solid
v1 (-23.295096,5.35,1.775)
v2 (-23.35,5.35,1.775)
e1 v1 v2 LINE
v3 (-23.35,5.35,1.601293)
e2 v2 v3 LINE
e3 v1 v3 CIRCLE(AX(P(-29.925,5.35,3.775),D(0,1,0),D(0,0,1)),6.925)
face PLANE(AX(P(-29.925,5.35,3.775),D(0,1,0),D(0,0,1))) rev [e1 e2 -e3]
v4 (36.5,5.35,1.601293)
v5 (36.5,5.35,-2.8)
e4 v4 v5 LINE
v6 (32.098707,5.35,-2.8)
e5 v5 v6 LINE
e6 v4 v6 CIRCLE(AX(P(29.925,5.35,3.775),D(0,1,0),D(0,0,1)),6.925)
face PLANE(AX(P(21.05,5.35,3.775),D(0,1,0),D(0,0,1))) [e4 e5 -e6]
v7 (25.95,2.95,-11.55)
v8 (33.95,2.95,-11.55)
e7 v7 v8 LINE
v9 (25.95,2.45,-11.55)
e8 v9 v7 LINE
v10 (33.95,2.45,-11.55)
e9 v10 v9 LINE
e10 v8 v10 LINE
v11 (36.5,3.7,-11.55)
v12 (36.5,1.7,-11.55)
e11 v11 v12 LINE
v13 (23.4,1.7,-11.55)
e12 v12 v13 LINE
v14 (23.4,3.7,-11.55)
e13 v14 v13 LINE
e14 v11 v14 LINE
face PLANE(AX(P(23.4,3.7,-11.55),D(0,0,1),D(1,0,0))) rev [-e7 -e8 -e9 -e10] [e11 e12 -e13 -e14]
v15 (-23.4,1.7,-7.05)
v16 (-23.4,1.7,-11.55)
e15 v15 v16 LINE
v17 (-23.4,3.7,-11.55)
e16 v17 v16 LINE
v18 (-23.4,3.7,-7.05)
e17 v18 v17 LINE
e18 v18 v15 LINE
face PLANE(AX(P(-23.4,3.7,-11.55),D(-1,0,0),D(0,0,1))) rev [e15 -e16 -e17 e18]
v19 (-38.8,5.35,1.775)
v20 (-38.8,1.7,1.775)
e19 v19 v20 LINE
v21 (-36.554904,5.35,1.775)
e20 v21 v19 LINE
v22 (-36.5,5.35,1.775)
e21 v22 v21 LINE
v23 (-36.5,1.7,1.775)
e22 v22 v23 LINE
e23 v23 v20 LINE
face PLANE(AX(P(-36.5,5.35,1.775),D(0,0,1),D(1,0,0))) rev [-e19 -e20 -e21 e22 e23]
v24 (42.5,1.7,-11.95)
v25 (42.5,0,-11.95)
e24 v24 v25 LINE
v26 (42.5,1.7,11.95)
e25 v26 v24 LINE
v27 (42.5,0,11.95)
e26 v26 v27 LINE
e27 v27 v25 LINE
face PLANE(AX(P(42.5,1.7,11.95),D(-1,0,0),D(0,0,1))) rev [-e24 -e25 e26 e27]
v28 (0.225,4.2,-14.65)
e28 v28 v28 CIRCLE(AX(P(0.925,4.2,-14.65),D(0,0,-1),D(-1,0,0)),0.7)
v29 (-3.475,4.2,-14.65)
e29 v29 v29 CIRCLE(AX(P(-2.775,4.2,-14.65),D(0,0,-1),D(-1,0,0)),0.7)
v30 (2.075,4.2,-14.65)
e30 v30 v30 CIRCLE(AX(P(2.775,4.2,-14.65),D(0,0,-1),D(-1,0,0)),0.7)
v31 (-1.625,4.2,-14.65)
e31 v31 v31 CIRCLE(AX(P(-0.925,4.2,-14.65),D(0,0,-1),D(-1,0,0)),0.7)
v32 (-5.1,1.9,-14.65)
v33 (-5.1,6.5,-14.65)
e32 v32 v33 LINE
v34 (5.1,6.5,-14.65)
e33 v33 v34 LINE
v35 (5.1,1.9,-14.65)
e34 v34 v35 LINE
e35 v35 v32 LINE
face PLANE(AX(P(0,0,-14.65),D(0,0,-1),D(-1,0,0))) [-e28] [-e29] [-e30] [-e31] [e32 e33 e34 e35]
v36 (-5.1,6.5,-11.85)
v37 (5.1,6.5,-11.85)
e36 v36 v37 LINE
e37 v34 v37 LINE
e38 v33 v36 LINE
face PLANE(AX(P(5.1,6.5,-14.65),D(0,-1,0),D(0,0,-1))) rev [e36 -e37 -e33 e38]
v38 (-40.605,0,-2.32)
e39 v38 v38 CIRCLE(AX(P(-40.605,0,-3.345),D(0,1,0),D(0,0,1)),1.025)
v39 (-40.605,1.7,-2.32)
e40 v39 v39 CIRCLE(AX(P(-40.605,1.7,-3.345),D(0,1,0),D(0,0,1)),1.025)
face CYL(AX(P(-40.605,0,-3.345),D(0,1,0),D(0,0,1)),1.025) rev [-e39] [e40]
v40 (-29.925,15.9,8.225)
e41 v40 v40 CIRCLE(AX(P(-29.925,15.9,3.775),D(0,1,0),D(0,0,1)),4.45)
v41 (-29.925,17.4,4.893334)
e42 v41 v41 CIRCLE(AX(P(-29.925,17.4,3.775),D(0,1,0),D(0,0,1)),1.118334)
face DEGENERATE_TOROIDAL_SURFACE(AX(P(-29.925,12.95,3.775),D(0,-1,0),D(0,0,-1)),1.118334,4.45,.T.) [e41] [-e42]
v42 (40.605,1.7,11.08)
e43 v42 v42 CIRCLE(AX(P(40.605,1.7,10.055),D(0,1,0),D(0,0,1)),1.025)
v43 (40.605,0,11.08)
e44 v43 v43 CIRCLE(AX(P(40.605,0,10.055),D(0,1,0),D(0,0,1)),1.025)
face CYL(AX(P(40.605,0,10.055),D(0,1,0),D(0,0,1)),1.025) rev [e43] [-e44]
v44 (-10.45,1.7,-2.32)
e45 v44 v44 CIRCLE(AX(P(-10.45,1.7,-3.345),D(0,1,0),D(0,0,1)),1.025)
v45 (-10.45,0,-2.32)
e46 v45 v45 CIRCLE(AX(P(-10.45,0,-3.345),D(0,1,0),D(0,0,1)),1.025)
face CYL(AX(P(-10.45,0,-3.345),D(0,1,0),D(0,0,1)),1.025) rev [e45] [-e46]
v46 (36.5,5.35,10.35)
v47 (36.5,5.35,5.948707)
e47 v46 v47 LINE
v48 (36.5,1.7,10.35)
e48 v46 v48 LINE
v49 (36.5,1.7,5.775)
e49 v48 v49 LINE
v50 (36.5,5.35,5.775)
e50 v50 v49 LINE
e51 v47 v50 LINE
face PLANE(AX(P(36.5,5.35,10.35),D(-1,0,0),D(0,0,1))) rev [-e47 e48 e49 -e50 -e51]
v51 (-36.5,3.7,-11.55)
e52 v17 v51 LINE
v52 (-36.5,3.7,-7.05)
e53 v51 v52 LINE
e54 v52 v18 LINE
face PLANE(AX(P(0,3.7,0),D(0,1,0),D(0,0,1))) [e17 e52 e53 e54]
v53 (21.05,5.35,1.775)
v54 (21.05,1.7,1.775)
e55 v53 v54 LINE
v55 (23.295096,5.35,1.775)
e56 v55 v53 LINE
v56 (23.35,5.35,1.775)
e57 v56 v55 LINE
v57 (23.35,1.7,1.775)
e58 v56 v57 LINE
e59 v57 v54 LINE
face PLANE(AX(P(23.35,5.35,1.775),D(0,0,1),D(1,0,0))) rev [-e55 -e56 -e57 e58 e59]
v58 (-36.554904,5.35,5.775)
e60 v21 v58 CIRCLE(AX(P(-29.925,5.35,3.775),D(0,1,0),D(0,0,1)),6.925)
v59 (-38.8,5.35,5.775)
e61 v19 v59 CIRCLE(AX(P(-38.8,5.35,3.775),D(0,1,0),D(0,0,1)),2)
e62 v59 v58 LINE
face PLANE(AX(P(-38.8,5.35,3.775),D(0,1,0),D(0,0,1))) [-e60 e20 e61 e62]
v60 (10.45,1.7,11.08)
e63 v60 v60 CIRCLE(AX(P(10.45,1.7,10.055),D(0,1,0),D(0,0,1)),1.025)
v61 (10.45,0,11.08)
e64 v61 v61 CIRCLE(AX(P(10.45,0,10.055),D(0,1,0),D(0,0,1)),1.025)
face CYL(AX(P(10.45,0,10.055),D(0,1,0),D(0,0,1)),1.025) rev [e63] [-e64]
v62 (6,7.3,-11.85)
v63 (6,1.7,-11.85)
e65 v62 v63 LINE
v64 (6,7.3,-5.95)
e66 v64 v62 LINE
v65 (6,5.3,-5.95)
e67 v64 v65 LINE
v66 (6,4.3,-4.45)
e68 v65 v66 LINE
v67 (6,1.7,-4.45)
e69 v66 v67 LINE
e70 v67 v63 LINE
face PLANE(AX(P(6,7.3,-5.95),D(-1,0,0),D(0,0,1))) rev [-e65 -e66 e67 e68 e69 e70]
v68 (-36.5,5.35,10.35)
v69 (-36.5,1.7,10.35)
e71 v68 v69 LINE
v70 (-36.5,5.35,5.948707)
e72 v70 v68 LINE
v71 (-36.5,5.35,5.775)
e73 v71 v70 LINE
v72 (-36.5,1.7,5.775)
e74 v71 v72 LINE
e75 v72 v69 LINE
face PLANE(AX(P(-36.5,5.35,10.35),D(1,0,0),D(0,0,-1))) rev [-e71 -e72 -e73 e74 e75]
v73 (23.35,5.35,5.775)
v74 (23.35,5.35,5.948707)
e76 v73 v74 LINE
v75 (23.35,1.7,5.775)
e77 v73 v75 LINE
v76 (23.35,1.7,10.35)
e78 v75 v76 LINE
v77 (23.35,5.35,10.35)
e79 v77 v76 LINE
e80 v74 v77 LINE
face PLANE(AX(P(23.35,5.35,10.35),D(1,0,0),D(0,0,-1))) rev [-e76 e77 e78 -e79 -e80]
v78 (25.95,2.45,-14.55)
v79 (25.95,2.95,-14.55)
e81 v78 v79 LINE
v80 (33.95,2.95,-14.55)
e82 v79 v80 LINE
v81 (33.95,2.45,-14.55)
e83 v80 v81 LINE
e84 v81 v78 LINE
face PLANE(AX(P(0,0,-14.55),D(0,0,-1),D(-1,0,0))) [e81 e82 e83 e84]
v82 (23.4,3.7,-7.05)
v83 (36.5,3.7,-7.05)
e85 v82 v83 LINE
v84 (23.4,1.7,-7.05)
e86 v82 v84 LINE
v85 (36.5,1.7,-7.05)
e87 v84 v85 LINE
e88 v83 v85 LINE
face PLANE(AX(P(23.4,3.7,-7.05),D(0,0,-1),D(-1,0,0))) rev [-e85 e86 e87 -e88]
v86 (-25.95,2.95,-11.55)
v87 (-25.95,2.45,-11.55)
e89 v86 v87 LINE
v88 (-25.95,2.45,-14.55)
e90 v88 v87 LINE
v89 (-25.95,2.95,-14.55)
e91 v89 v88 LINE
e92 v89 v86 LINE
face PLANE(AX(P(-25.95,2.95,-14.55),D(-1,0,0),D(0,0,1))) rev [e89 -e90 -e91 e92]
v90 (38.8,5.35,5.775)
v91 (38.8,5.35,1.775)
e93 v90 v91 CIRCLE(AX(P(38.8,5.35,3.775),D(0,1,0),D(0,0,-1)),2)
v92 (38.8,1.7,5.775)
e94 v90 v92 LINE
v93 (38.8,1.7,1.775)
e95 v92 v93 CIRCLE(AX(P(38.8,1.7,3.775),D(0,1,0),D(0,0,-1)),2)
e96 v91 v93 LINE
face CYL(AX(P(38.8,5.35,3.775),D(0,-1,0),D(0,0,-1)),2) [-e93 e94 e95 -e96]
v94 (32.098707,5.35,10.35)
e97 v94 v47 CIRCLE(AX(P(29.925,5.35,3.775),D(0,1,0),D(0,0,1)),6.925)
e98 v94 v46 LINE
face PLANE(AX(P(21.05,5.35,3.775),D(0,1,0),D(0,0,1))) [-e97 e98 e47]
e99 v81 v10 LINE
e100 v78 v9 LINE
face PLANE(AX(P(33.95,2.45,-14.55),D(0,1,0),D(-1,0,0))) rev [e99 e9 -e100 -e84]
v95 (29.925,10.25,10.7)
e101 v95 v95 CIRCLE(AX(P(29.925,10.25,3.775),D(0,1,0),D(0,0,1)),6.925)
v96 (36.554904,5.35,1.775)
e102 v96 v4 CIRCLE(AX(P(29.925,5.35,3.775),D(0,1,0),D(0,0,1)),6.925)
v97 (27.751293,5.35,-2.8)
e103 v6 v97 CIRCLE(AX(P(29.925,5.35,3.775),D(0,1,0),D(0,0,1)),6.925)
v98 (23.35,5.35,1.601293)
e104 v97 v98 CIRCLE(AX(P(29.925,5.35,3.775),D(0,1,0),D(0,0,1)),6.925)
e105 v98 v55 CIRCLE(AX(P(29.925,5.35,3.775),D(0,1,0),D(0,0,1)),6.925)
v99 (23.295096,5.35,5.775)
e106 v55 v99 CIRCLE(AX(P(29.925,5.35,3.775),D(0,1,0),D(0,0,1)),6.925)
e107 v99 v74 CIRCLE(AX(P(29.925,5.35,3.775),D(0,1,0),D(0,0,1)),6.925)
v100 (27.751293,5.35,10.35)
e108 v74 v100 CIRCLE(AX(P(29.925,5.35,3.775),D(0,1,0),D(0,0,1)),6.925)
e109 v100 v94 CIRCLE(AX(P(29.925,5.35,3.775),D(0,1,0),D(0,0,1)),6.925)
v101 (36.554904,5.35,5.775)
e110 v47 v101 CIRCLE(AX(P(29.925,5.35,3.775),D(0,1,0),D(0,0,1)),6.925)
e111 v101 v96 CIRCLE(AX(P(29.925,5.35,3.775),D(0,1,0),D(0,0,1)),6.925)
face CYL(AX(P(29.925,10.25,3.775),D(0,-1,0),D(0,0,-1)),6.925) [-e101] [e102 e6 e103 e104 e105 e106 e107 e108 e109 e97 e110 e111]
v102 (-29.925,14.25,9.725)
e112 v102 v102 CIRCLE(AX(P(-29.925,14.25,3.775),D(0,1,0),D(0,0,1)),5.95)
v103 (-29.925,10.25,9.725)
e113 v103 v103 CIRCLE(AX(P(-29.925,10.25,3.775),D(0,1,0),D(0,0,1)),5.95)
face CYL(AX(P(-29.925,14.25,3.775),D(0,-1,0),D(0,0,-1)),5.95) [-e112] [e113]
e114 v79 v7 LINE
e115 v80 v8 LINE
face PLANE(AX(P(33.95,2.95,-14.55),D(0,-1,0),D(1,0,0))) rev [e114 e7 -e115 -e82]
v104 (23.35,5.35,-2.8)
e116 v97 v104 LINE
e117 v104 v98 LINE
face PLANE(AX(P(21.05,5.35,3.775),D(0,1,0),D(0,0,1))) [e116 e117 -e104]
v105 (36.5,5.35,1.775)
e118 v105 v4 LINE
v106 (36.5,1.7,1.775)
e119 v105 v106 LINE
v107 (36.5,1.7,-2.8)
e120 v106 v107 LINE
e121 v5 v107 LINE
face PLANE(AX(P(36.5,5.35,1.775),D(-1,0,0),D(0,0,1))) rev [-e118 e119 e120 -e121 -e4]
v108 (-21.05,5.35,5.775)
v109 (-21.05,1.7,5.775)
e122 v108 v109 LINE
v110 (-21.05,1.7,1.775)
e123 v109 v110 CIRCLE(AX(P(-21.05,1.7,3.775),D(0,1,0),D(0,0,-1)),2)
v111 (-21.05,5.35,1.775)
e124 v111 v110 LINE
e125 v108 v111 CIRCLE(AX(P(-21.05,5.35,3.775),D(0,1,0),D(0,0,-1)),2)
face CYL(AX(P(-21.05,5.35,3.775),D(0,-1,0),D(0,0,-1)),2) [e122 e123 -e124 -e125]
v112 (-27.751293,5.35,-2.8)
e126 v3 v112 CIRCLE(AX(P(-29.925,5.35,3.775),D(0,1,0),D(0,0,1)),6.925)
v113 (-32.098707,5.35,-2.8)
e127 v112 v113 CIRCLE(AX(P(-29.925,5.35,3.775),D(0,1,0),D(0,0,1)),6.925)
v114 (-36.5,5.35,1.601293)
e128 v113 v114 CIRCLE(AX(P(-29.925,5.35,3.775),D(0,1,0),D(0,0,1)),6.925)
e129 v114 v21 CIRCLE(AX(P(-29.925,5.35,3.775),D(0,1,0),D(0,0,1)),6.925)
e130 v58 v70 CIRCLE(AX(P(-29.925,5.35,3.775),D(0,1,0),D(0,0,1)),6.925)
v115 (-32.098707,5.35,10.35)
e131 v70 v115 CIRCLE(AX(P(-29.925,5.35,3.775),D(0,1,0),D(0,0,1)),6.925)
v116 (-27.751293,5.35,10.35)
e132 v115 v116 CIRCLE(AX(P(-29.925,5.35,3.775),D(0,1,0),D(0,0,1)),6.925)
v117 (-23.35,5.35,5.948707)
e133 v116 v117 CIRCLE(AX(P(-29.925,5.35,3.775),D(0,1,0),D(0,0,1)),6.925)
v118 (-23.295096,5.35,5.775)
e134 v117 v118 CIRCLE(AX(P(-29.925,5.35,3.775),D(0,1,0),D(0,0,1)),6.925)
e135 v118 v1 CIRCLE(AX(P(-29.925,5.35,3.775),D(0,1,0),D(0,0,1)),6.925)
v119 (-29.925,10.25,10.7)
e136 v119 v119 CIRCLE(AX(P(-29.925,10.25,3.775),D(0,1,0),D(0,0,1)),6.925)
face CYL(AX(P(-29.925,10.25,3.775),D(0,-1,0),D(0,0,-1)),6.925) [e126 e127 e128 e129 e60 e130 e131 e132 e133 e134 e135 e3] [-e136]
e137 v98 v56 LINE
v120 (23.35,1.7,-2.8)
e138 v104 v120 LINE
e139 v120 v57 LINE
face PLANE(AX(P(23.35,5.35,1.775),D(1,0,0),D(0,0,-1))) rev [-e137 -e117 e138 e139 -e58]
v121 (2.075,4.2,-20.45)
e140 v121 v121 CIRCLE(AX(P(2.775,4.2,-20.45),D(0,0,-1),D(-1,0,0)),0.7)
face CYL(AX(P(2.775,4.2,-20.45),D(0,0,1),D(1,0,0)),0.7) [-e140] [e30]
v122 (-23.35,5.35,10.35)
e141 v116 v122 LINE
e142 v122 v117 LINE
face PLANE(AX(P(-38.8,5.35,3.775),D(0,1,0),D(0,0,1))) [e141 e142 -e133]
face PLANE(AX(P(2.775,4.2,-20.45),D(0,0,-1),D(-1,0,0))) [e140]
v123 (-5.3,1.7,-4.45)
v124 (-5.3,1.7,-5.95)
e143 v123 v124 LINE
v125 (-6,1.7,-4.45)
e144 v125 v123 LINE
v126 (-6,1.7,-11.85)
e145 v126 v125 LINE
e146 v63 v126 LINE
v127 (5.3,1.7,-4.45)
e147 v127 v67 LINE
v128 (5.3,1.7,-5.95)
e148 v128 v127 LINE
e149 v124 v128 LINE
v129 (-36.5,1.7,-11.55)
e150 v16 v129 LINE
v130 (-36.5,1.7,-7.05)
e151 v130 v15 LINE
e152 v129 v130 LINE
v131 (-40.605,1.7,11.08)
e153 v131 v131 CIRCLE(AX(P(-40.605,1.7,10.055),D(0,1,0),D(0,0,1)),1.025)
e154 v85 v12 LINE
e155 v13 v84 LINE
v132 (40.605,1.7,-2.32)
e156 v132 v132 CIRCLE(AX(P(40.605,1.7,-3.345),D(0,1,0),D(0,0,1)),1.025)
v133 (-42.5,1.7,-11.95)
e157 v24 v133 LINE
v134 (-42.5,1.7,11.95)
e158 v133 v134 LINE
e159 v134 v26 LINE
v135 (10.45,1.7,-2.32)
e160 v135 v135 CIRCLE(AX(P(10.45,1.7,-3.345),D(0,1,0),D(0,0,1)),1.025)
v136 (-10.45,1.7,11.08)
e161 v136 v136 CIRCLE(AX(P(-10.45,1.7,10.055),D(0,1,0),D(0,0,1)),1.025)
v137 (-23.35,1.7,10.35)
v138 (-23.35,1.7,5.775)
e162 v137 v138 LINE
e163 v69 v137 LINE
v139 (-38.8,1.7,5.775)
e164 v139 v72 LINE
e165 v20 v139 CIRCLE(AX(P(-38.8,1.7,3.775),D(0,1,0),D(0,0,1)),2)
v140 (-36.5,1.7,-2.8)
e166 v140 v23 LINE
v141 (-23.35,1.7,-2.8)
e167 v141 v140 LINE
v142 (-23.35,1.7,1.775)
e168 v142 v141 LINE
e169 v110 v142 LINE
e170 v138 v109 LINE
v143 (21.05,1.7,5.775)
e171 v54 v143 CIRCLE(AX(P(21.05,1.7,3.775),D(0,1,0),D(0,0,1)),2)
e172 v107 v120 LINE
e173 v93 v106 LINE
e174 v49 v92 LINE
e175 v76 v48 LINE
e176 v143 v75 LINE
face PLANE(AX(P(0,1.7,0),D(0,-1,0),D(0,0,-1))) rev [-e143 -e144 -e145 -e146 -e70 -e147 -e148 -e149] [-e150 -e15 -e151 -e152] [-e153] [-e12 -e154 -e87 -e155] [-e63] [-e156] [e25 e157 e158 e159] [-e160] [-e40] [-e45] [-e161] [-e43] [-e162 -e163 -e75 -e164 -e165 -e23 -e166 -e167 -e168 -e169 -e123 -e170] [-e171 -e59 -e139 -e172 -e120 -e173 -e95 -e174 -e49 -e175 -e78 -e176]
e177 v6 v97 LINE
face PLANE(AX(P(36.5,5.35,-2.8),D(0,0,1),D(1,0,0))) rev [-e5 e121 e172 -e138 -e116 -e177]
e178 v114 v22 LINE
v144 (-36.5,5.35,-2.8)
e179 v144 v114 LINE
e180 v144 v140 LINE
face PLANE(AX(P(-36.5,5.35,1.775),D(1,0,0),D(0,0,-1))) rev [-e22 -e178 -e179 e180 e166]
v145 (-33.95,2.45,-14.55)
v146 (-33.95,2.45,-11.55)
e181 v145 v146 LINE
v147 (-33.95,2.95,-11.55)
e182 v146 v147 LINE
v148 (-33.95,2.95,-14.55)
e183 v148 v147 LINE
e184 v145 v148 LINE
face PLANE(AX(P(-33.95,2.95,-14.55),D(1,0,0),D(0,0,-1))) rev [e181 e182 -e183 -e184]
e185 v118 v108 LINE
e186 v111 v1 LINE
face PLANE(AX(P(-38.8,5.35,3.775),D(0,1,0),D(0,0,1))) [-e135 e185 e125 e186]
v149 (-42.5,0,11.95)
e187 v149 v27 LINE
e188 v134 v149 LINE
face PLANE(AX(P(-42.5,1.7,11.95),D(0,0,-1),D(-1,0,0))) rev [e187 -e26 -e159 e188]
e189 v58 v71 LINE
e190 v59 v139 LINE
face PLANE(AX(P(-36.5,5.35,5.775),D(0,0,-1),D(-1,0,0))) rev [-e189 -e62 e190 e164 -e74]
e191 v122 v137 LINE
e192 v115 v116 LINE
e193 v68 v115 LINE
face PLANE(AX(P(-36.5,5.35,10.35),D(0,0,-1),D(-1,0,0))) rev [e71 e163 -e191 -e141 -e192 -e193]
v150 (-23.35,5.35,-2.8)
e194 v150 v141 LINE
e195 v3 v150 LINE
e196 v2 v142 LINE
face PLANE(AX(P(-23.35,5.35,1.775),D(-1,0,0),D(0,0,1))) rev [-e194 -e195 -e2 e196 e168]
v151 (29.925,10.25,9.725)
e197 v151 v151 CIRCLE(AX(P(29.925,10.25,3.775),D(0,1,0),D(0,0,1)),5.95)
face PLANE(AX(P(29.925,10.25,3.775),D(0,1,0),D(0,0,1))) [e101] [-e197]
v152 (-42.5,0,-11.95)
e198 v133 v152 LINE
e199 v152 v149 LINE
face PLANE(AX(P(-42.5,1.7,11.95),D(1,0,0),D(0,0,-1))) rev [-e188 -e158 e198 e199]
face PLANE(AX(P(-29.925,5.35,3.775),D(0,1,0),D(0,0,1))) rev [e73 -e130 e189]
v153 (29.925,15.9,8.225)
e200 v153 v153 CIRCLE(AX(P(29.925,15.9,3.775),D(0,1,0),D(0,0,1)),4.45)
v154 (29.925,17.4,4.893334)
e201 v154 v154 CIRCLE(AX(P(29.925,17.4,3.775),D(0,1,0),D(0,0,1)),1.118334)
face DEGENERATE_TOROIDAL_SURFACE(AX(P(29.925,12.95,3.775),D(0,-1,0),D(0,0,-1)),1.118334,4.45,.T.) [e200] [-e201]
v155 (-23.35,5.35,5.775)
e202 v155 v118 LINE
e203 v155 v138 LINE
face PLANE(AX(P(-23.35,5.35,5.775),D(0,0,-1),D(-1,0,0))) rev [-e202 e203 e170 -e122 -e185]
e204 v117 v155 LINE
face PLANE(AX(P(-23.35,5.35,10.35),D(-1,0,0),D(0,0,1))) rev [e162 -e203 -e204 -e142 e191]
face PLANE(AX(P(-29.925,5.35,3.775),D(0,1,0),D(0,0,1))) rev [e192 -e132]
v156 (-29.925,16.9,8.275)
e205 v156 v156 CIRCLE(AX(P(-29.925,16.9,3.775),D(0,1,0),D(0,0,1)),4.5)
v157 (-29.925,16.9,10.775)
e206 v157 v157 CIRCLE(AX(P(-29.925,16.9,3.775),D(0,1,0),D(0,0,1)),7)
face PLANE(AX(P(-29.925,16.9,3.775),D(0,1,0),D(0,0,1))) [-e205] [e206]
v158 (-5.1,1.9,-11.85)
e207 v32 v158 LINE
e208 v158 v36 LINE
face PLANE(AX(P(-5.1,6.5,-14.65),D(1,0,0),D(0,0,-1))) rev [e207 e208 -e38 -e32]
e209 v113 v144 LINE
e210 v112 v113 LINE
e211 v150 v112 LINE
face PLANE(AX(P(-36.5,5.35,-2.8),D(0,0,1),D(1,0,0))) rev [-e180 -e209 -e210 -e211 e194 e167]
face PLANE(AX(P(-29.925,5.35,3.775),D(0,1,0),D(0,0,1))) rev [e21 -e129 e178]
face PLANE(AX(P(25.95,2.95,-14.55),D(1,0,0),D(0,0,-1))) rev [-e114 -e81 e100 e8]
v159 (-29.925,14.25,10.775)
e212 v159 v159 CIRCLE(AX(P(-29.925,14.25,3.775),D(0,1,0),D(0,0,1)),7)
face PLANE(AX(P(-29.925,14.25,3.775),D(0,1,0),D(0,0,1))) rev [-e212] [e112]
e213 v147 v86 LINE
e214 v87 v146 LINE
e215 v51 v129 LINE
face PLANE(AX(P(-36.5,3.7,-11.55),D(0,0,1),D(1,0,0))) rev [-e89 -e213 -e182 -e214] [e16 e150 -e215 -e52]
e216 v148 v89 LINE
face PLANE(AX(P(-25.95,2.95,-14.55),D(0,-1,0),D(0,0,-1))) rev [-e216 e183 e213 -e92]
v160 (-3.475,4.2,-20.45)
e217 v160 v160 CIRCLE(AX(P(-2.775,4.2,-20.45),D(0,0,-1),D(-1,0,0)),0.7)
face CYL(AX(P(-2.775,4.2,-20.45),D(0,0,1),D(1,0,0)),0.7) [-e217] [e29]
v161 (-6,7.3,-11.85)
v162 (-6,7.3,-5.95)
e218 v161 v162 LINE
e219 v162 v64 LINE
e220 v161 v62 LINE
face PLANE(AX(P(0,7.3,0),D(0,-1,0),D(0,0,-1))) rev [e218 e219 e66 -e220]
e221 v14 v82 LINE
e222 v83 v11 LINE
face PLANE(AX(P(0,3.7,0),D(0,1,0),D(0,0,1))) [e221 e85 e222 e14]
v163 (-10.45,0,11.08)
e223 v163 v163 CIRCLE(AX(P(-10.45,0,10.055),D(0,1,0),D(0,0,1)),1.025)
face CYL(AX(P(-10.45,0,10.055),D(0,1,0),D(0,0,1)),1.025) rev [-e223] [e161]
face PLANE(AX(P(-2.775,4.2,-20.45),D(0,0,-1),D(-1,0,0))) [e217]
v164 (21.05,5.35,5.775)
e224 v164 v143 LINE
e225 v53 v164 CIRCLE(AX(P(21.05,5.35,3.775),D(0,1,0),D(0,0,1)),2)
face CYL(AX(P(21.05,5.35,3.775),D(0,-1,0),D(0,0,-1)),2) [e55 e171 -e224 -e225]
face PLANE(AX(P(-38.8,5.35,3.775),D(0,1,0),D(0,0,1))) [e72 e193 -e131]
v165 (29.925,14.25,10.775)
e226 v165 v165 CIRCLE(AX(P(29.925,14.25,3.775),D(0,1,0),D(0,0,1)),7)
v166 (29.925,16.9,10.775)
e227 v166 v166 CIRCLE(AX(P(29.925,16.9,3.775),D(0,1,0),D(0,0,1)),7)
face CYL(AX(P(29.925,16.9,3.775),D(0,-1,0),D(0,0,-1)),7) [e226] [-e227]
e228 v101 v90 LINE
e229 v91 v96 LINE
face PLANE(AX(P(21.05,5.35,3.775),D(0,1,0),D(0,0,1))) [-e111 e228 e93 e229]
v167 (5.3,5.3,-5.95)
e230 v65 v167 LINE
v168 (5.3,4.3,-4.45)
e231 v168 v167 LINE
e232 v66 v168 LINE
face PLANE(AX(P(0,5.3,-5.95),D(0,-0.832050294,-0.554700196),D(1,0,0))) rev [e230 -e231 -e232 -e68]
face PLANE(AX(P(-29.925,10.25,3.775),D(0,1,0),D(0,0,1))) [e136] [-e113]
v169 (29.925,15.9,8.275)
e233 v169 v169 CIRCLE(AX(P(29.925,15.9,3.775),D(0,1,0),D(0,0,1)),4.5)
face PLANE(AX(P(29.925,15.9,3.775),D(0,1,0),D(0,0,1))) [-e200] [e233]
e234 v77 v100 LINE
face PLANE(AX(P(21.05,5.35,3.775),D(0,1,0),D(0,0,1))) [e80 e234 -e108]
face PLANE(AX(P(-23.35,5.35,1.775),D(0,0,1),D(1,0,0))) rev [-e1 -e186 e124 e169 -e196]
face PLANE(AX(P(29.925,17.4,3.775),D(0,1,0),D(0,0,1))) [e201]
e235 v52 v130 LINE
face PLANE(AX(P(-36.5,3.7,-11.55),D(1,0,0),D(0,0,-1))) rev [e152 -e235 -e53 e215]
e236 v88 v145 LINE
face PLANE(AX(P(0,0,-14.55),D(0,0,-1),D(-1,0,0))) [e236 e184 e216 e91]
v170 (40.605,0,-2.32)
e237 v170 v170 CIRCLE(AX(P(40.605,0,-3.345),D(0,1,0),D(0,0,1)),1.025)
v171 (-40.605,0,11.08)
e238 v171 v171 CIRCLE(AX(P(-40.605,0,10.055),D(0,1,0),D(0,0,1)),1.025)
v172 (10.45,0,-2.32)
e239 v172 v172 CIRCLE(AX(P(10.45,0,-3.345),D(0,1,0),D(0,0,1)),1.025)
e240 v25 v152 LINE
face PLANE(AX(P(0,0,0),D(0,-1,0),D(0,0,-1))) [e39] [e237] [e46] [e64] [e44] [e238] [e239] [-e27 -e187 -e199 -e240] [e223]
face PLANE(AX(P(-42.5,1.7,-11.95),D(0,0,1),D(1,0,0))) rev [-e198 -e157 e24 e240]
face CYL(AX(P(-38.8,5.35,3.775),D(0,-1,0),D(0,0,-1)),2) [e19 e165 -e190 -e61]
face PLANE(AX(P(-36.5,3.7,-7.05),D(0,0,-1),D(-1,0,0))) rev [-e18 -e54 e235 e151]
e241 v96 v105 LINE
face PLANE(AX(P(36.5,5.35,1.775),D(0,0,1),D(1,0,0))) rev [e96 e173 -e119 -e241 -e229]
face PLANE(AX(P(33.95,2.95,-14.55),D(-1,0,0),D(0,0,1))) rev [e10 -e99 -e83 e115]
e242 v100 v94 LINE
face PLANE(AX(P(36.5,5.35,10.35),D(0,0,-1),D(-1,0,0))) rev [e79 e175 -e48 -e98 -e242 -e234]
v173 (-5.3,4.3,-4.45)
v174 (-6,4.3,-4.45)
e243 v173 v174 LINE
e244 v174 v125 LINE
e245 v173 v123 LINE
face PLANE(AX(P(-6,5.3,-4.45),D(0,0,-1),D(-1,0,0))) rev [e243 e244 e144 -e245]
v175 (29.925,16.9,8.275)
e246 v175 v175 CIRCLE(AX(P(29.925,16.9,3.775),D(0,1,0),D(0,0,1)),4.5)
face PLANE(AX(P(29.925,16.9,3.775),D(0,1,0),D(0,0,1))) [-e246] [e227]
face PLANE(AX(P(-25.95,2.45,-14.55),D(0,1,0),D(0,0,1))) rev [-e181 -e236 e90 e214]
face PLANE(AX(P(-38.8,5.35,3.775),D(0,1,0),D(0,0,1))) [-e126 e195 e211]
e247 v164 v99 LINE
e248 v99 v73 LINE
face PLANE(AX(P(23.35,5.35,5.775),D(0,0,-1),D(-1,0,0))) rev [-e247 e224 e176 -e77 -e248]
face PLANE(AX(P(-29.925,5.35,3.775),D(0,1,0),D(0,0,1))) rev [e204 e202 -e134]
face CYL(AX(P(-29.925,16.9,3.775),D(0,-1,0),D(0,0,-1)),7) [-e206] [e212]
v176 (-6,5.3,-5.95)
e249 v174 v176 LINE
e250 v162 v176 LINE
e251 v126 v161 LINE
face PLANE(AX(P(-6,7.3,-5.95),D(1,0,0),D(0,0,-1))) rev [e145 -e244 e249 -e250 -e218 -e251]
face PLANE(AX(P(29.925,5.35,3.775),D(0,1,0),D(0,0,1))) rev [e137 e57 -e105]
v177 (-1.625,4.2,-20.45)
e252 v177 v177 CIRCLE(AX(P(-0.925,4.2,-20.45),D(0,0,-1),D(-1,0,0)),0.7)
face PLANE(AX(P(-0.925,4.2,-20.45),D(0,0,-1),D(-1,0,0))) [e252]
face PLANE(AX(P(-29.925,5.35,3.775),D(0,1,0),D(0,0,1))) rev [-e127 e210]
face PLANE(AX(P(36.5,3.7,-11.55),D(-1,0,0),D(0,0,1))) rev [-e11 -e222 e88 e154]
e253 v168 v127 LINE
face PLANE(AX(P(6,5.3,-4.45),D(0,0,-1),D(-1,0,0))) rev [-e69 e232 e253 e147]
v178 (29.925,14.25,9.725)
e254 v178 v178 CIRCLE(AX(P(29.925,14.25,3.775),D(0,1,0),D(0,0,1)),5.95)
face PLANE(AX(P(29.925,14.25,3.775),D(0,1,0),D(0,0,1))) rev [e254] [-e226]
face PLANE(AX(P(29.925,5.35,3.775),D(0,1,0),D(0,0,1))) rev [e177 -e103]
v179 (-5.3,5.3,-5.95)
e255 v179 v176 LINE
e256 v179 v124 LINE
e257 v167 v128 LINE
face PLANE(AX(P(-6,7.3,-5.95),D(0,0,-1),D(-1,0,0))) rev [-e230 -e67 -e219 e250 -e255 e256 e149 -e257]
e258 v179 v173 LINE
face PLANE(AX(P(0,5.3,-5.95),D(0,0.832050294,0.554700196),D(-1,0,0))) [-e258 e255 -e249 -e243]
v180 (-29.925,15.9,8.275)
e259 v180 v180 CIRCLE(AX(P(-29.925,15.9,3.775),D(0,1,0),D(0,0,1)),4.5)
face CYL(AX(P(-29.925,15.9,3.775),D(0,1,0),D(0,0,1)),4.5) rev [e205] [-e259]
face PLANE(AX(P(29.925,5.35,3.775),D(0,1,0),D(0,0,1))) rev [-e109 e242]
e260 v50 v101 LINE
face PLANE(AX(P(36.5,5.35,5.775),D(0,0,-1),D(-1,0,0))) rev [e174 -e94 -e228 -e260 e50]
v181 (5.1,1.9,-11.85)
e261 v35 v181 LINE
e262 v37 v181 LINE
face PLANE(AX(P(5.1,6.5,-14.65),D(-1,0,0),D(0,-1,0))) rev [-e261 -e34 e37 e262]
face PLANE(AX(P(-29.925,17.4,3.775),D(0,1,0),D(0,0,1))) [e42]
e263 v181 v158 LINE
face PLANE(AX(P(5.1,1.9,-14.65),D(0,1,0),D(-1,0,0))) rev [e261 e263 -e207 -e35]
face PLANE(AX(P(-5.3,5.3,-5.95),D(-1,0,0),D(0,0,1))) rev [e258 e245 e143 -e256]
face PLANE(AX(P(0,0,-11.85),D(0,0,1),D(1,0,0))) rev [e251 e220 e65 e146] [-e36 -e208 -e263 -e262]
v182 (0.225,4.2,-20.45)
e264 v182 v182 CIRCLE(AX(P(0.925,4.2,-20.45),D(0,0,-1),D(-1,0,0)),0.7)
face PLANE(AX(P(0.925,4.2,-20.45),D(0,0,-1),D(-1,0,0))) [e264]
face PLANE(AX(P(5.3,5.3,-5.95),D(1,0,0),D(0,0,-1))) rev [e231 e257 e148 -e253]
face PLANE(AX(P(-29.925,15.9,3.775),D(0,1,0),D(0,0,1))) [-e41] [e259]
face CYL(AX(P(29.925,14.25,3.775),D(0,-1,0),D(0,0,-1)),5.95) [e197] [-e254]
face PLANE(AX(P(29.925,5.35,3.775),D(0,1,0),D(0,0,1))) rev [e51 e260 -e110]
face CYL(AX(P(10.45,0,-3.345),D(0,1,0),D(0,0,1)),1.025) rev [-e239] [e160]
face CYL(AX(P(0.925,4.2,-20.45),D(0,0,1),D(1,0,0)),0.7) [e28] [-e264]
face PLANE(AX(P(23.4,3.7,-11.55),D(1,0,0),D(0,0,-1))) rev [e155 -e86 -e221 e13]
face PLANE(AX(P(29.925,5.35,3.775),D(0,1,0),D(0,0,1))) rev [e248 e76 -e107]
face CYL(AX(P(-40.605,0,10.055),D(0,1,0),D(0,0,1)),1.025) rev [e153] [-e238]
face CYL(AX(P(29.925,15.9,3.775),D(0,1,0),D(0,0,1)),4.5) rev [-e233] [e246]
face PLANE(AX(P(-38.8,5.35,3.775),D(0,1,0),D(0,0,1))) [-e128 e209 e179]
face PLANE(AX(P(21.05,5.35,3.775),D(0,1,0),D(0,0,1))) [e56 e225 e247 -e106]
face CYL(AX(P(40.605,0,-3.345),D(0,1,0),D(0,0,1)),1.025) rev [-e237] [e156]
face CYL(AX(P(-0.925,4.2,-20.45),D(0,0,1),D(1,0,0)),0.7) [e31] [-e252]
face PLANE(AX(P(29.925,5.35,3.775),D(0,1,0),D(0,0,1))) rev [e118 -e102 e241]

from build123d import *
from OCP.BRepFilletAPI import BRepFilletAPI_MakeChamfer

# Parameters (mm, degrees)
SKETCH1_W            = 85
SKETCH1_H            = 23.9
BOSS_EXTRUDE1_DEPTH  = 1.7
SKETCH2_R            = 1.025
CUT_EXTRUDE1_DEPTH   = 45.180793338
SKETCH3_W            = 12
SKETCH3_H            = 6
BOSS_EXTRUDE2_DEPTH  = 5.6
SKETCH4_W            = 0.7
SKETCH4_H            = 1.5
BOSS_EXTRUDE3_DEPTH  = 3.6
CHAMFER1_SIZE        = 1.5
CHAMFER1_SIZE_2      = 1
SKETCH5_W            = 12
SKETCH5_H            = 5.6
CUT_EXTRUDE2_DEPTH   = 0.1
SKETCH6_W            = 10.2
SKETCH6_H            = 4.6
BOSS_EXTRUDE4_DEPTH  = 2.8
SKETCH7_R            = 0.7
BOSS_EXTRUDE5_DEPTH  = 5.8
BOSS_EXTRUDE6_DEPTH  = 3.65
SKETCH9_R            = 6.925
BOSS_EXTRUDE7_DEPTH  = 4.9
SKETCH10_R           = 5.95
BOSS_EXTRUDE8_DEPTH  = 4
SKETCH11_R           = 7
BOSS_EXTRUDE9_DEPTH  = 2.65
SKETCH12_R           = 4.5
CUT_EXTRUDE3_DEPTH   = 1
SKETCH13_R           = 4.45
BOSS_EXTRUDE10_DEPTH = 1.5
FILLET1_R            = 4.45
SKETCH14_W           = 13.1
SKETCH14_H           = 4.5
BOSS_EXTRUDE11_DEPTH = 2
SKETCH15_W           = 8
SKETCH15_H           = 0.5
BOSS_EXTRUDE12_DEPTH = 3


# Some blends are built 0.0001 mm under size
with BuildPart() as part:
    # Sketch1 → Boss-Extrude1 (new body)
    with BuildSketch(Plane(origin=(0, 0, 0), x_dir=(1, 0, 0), z_dir=(0, 1, 0))):
        Rectangle(SKETCH1_W, SKETCH1_H)
    extrude(amount=BOSS_EXTRUDE1_DEPTH)

    # Sketch2 → Cut-Extrude1 (cut, through all)
    with BuildSketch(Plane(origin=(0, 1.7, 0), x_dir=(1, 0, 0), z_dir=(0, 1, 0))):
        with Locations(Location((-40.605, 3.345, 0), (0, 0, 270))):
            Circle(SKETCH2_R)
        with Locations(Location((-10.45, 3.345, 0), (0, 0, 270))):
            Circle(SKETCH2_R)
        with Locations(Location((-40.605, -10.055, 0), (0, 0, 270))):
            Circle(SKETCH2_R)
        with Locations(Location((-10.45, -10.055, 0), (0, 0, 270))):
            Circle(SKETCH2_R)
        with Locations(Location((10.45, 3.345, 0), (0, 0, 270))):
            Circle(SKETCH2_R)
        with Locations(Location((40.605, 3.345, 0), (0, 0, 270))):
            Circle(SKETCH2_R)
        with Locations(Location((40.605, -10.055, 0), (0, 0, 270))):
            Circle(SKETCH2_R)
        with Locations(Location((10.45, -10.055, 0), (0, 0, 270))):
            Circle(SKETCH2_R)
    extrude(amount=-CUT_EXTRUDE1_DEPTH, mode=Mode.SUBTRACT)

    # Sketch3 → Boss-Extrude2 (add)
    with BuildSketch(Plane(origin=(0, 1.7, 0), x_dir=(1, 0, 0), z_dir=(0, 1, 0))):
        with Locations((0, 8.95)):
            Rectangle(SKETCH3_W, SKETCH3_H)
    extrude(amount=BOSS_EXTRUDE2_DEPTH)

    # Sketch4 → Boss-Extrude3 (add)
    with BuildSketch(Plane(origin=(0, 1.7, 0), x_dir=(1, 0, 0), z_dir=(0, 1, 0))):
        with Locations((-5.65, 5.2)):
            Rectangle(SKETCH4_W, SKETCH4_H)
        with Locations((5.65, 5.2)):
            Rectangle(SKETCH4_W, SKETCH4_H)
    extrude(amount=BOSS_EXTRUDE3_DEPTH)

    # Chamfer1
    chamfer1_edges_1 = [part.edges().sort_by_distance(p)[0] for p in [
        (-5.65, 5.3, -4.45),
    ]]
    chamfer1_side_1 = [part.faces().sort_by_distance(p)[0] for p in [
        (-5.65, 5.3, -4.47),
    ]]
    chamfer1_edges_2 = [part.edges().sort_by_distance(p)[0] for p in [
        (5.65, 5.3, -4.45),
    ]]
    chamfer1_side_2 = [part.faces().sort_by_distance(p)[0] for p in [
        (5.65, 5.3, -4.47),
    ]]
    chamfer1 = BRepFilletAPI_MakeChamfer(part.part.solid().wrapped)
    for e in chamfer1_edges_1:
        chamfer1.Add(CHAMFER1_SIZE - 0.0001, CHAMFER1_SIZE_2 - 0.0001, e.wrapped, chamfer1_side_1[0].wrapped)
    for e in chamfer1_edges_2:
        chamfer1.Add(CHAMFER1_SIZE - 0.0001, CHAMFER1_SIZE_2 - 0.0001, e.wrapped, chamfer1_side_2[0].wrapped)
    add(Compound.cast(chamfer1.Shape()), mode=Mode.REPLACE)  # a hair under: the kernel refuses the full size

    # Sketch5 → Cut-Extrude2 (cut)
    with BuildSketch(Plane(origin=(0, 0, -11.95), x_dir=(-1, 0, 0), z_dir=(0, 0, -1))):
        with Locations((0, 4.5)):
            Rectangle(SKETCH5_W, SKETCH5_H)
    extrude(amount=-CUT_EXTRUDE2_DEPTH, mode=Mode.SUBTRACT)

    # Sketch6 → Boss-Extrude4 (add)
    with BuildSketch(Plane(origin=(0, 0, -11.85), x_dir=(-1, 0, 0), z_dir=(0, 0, -1))):
        with Locations((0, 4.2)):
            Rectangle(SKETCH6_W, SKETCH6_H)
    extrude(amount=BOSS_EXTRUDE4_DEPTH)

    # Sketch7 → Boss-Extrude5 (add)
    with BuildSketch(Plane(origin=(0, 0, -14.65), x_dir=(-1, 0, 0), z_dir=(0, 0, -1))):
        with Locations((0.925, 4.2)):
            Circle(SKETCH7_R)
        with Locations((-0.925, 4.2)):
            Circle(SKETCH7_R)
        with Locations((-2.775, 4.2)):
            Circle(SKETCH7_R)
        with Locations((2.775, 4.2)):
            Circle(SKETCH7_R)
    extrude(amount=BOSS_EXTRUDE5_DEPTH)

    # Sketch8 → Boss-Extrude6 (add)
    with BuildSketch(Plane(origin=(0, 1.7, 0), x_dir=(1, 0, 0), z_dir=(0, 1, 0))):
        with BuildLine():
            Line((-36.5, -10.35), (-23.35, -10.35))
            Line((-23.35, -10.35), (-23.35, -5.775))
            Line((-23.35, -5.775), (-21.05, -5.775))
            ThreePointArc((-21.05, -5.775), (-19.05, -3.775), (-21.05, -1.775))
            Line((-21.05, -1.775), (-23.35, -1.775))
            Line((-23.35, -1.775), (-23.35, 2.8))
            Line((-23.35, 2.8), (-36.5, 2.8))
            Line((-36.5, 2.8), (-36.5, -1.775))
            Line((-36.5, -1.775), (-38.8, -1.775))
            ThreePointArc((-38.8, -1.775), (-40.8, -3.775), (-38.8, -5.775))
            Line((-38.8, -5.775), (-36.5, -5.775))
            Line((-36.5, -5.775), (-36.5, -10.35))
        make_face()
        with BuildLine():
            Line((23.35, -1.775), (23.35, 2.8))
            Line((23.35, 2.8), (36.5, 2.8))
            Line((36.5, 2.8), (36.5, -1.775))
            Line((36.5, -1.775), (38.8, -1.775))
            ThreePointArc((38.8, -1.775), (40.8, -3.775), (38.8, -5.775))
            Line((38.8, -5.775), (36.5, -5.775))
            Line((36.5, -5.775), (36.5, -10.35))
            Line((36.5, -10.35), (23.35, -10.35))
            Line((23.35, -10.35), (23.35, -5.775))
            Line((23.35, -5.775), (21.05, -5.775))
            ThreePointArc((21.05, -5.775), (19.05, -3.775), (21.05, -1.775))
            Line((21.05, -1.775), (23.35, -1.775))
        make_face()
    extrude(amount=BOSS_EXTRUDE6_DEPTH)

    # Sketch9 → Boss-Extrude7 (add)
    with BuildSketch(Plane(origin=(0, 5.35, 0), x_dir=(1, 0, 0), z_dir=(0, 1, 0))):
        with Locations(Location((-29.925, -3.775, 0), (0, 0, 71.706023749))):
            Circle(SKETCH9_R)
        with Locations(Location((29.925, -3.775, 0), (0, 0, 71.706023749))):
            Circle(SKETCH9_R)
    extrude(amount=BOSS_EXTRUDE7_DEPTH)

    # Sketch10 → Boss-Extrude8 (add)
    with BuildSketch(Plane(origin=(0, 10.25, 0), x_dir=(1, 0, 0), z_dir=(0, 1, 0))):
        with Locations(Location((-29.925, -3.775, 0), (0, 0, 270))):
            Circle(SKETCH10_R)
        with Locations(Location((29.925, -3.775, 0), (0, 0, 270))):
            Circle(SKETCH10_R)
    extrude(amount=BOSS_EXTRUDE8_DEPTH)

    # Sketch11 → Boss-Extrude9 (add)
    with BuildSketch(Plane(origin=(0, 14.25, 0), x_dir=(1, 0, 0), z_dir=(0, 1, 0))):
        with Locations(Location((-29.925, -3.775, 0), (0, 0, 270))):
            Circle(SKETCH11_R)
        with Locations(Location((29.925, -3.775, 0), (0, 0, 270))):
            Circle(SKETCH11_R)
    extrude(amount=BOSS_EXTRUDE9_DEPTH)

    # Sketch12 → Cut-Extrude3 (cut)
    with BuildSketch(Plane(origin=(0, 16.9, 0), x_dir=(1, 0, 0), z_dir=(0, 1, 0))):
        with Locations(Location((-29.925, -3.775, 0), (0, 0, 270))):
            Circle(SKETCH12_R)
        with Locations(Location((29.925, -3.775, 0), (0, 0, 270))):
            Circle(SKETCH12_R)
    extrude(amount=-CUT_EXTRUDE3_DEPTH, mode=Mode.SUBTRACT)

    # Sketch13 → Boss-Extrude10 (add)
    with BuildSketch(Plane(origin=(0, 15.9, 0), x_dir=(1, 0, 0), z_dir=(0, 1, 0))):
        with Locations(Location((-29.925, -3.775, 0), (0, 0, 270))):
            Circle(SKETCH13_R)
        with Locations(Location((29.925, -3.775, 0), (0, 0, 270))):
            Circle(SKETCH13_R)
    extrude(amount=BOSS_EXTRUDE10_DEPTH)

    # Fillet1
    # the kernel refuses this fillet: 4.45 mm, written as the material it takes off along each edge
    with BuildSketch(Plane(origin=(-29.925, 17.4, 3.775), x_dir=(0, 0, 1), z_dir=(-1, 0, 0))) as fillet1_piece_1:
        with BuildLine():
            CenterArc((1.11833375, -4.45), FILLET1_R, 41.52305383, 48.47694617)
            Line((1.11833375, 0), (4.45, 0))
            Line((4.45, 0), (4.45, -1.5))
        make_face()
    revolve(axis=Axis((-29.925, 17.4, 3.775), (0, 1, 0)), mode=Mode.SUBTRACT)
    with BuildSketch(Plane(origin=(29.925, 17.4, 3.775), x_dir=(0, 0, 1), z_dir=(-1, 0, 0))) as fillet1_piece_2:
        with BuildLine():
            CenterArc((1.11833375, -4.45), FILLET1_R, 41.52305383, 48.47694617)
            Line((1.11833375, 0), (4.45, 0))
            Line((4.45, 0), (4.45, -1.5))
        make_face()
    revolve(axis=Axis((29.925, 17.4, 3.775), (0, 1, 0)), mode=Mode.SUBTRACT)

    # Sketch14 → Boss-Extrude11 (add)
    with BuildSketch(Plane(origin=(0, 1.7, 0), x_dir=(1, 0, 0), z_dir=(0, 1, 0))):
        with Locations((-29.95, 9.3)):
            Rectangle(SKETCH14_W, SKETCH14_H)
        with Locations((29.95, 9.3)):
            Rectangle(SKETCH14_W, SKETCH14_H)
    extrude(amount=BOSS_EXTRUDE11_DEPTH)

    # Sketch15 → Boss-Extrude12 (add)
    with BuildSketch(Plane(origin=(0, 0, -11.55), x_dir=(-1, 0, 0), z_dir=(0, 0, -1))):
        with Locations((-29.95, 2.7)):
            Rectangle(SKETCH15_W, SKETCH15_H)
        with Locations((29.95, 2.7)):
            Rectangle(SKETCH15_W, SKETCH15_H)
    extrude(amount=BOSS_EXTRUDE12_DEPTH)


solid = part.part
